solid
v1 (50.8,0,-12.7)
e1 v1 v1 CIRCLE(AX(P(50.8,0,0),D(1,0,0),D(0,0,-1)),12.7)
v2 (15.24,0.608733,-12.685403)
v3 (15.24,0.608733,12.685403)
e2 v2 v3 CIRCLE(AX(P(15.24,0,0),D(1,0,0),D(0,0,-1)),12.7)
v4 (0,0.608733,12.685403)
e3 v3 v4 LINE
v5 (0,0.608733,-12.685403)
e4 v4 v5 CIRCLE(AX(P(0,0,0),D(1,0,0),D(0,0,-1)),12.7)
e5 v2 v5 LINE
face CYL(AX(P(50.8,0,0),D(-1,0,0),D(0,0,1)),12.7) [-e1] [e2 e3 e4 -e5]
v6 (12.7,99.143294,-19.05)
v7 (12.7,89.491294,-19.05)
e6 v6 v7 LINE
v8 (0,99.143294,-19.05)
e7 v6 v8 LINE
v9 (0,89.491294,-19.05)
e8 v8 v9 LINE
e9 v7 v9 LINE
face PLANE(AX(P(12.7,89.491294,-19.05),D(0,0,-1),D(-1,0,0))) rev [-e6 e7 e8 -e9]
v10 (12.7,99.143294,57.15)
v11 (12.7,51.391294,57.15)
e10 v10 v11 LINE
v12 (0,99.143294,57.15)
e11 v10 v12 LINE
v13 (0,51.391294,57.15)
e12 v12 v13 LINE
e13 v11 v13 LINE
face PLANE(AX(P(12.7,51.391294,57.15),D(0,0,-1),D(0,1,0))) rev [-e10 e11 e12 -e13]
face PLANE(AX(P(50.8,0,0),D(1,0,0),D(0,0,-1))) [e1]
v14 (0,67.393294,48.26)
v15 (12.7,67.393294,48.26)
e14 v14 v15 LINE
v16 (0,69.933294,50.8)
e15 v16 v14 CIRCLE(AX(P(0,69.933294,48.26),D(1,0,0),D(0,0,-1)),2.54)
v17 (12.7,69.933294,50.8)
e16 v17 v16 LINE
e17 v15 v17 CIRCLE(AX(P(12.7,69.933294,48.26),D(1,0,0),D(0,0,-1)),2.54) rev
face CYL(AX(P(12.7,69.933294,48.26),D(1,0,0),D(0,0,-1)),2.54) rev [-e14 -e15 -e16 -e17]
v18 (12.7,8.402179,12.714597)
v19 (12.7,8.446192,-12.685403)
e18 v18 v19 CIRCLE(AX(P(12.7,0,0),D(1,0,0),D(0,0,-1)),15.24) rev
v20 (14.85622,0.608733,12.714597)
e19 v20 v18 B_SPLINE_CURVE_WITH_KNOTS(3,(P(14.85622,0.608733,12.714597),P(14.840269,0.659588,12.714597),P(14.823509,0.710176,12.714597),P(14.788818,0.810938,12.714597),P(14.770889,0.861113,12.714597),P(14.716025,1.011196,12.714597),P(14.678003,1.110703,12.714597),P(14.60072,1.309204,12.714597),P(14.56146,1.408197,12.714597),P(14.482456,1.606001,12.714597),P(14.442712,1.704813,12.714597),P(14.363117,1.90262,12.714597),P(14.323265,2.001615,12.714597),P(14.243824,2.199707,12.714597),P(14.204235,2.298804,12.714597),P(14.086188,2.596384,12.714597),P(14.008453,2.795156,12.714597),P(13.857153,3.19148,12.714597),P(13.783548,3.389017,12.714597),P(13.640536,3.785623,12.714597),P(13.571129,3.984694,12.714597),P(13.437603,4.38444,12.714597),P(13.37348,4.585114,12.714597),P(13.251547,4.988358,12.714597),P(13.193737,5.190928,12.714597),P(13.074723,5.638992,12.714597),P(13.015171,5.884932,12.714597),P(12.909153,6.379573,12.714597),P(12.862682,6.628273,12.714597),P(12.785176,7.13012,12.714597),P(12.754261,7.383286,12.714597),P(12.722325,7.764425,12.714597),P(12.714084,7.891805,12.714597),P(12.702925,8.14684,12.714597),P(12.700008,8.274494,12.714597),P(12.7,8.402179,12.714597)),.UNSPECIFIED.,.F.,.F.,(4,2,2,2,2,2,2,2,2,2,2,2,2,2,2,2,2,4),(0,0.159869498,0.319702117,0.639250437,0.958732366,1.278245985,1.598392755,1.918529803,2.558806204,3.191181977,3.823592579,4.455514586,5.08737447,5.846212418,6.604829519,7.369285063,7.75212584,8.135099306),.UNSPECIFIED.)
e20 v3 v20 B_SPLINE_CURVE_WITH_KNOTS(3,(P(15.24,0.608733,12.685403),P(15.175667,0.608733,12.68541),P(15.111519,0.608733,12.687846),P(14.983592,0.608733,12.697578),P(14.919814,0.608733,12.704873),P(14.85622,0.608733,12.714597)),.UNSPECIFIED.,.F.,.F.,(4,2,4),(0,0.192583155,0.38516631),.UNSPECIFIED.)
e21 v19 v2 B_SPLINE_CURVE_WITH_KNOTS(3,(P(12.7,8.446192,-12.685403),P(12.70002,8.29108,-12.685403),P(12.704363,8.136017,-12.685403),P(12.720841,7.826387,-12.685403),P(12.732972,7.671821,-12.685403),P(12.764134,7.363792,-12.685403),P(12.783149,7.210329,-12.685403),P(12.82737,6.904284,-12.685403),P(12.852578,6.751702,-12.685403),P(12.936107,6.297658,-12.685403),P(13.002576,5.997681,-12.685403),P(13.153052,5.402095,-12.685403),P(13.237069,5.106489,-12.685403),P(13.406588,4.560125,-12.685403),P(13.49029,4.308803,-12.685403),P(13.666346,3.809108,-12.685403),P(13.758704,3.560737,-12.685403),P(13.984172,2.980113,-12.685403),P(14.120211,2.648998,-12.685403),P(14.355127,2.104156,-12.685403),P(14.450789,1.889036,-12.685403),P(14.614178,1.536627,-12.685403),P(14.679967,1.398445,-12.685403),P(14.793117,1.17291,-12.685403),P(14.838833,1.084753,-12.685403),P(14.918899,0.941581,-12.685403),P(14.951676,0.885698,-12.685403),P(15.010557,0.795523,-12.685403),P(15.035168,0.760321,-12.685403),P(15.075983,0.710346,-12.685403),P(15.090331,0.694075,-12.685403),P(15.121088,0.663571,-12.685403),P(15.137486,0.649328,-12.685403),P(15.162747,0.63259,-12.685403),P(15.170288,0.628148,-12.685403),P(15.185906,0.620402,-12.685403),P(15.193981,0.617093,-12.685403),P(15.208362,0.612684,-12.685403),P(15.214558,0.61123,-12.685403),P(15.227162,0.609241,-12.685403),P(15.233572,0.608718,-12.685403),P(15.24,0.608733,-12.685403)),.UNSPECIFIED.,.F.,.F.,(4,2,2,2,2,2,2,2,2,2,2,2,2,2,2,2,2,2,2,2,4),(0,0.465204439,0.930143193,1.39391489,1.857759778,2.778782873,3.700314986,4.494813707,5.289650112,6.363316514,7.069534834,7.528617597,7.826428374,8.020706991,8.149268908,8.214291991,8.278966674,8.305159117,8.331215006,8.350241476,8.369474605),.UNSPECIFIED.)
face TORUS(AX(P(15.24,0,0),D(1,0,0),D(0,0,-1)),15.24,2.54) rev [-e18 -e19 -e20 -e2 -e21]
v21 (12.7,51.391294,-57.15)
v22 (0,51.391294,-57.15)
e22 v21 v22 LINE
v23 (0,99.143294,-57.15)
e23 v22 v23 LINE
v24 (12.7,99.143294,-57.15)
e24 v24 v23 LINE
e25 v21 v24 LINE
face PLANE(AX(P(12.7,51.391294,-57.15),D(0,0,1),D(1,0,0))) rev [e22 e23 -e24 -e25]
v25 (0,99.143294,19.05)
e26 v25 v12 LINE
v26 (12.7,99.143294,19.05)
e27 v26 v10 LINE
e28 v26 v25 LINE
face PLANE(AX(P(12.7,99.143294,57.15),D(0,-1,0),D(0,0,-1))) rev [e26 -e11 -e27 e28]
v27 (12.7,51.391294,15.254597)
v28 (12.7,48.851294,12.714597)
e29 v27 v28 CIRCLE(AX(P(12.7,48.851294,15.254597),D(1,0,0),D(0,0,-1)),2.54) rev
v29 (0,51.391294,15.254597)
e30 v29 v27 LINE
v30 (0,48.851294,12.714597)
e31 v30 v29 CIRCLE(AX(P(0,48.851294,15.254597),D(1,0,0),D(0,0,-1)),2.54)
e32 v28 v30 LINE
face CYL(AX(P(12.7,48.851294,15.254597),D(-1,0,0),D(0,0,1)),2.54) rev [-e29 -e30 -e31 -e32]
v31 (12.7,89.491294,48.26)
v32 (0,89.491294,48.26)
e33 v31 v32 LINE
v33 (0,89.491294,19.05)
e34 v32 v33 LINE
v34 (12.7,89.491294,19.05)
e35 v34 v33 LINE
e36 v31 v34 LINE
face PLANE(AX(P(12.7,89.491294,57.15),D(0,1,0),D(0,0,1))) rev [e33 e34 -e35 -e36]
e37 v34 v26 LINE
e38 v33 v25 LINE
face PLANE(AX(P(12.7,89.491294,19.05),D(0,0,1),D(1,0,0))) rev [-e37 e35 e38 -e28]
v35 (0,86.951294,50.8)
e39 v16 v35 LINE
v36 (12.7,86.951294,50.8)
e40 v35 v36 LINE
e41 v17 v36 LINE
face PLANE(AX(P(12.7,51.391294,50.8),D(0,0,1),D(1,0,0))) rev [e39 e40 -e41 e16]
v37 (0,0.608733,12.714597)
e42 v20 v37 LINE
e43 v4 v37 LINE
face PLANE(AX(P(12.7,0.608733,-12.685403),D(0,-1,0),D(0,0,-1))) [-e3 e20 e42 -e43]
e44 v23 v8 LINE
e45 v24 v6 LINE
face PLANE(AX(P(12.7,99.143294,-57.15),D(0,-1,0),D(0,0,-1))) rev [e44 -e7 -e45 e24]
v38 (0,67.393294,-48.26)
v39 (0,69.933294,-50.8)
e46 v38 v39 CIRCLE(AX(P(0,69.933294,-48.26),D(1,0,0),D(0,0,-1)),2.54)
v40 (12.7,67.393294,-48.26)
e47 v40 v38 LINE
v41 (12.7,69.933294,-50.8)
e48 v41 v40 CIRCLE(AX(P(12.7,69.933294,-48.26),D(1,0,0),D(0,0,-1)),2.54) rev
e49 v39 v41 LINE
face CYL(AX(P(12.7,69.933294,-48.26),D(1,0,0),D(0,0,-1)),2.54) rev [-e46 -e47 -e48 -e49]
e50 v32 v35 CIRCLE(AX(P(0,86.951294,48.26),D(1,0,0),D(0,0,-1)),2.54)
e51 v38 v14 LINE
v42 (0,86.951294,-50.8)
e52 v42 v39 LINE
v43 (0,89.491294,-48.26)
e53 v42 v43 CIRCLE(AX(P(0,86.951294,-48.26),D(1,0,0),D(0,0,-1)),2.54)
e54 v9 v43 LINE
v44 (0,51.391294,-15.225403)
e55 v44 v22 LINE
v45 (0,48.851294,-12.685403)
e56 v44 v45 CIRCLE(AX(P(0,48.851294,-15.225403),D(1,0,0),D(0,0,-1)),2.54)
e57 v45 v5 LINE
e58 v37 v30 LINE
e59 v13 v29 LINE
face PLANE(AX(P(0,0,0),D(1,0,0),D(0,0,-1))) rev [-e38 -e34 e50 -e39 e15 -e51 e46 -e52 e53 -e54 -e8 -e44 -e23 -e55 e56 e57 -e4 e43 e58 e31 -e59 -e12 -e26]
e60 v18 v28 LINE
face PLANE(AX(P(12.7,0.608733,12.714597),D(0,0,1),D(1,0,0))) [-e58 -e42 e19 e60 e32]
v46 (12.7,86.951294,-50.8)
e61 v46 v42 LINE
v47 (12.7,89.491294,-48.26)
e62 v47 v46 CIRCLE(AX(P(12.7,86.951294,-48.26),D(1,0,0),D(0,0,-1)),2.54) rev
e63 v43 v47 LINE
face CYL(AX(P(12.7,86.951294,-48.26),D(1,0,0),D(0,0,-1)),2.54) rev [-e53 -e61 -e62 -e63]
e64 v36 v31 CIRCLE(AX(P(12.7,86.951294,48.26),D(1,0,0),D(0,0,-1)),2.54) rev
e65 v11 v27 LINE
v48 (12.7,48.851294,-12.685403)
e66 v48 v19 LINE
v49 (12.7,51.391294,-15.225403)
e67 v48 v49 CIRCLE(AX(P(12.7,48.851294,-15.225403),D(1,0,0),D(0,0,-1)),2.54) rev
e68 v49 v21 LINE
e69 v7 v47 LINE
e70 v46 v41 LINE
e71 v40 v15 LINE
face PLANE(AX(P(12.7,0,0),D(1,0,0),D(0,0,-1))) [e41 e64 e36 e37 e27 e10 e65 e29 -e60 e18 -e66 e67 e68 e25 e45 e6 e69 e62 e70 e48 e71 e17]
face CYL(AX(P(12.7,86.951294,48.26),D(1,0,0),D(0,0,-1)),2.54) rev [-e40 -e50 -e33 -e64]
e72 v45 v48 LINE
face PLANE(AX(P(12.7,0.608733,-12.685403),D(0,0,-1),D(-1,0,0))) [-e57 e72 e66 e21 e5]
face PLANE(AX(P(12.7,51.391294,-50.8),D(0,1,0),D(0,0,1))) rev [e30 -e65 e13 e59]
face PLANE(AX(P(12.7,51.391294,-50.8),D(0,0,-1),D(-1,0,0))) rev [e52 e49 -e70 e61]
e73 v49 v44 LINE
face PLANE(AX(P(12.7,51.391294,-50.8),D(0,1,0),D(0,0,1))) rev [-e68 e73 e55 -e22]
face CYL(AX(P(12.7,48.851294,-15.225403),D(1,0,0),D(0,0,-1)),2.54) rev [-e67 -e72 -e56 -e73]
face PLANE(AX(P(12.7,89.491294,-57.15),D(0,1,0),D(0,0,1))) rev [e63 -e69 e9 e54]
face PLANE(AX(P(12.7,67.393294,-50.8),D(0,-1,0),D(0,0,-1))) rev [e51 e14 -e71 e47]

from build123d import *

# Parameters (mm, degrees)
SKETCH2_R           = 12.7
BOSS_EXTRUDE1_DEPTH = 50.8
SKETCH3_W           = 25.4
SKETCH3_H           = 50.8
BOSS_EXTRUDE2_DEPTH = 12.7
SKETCH5_W           = 101.6
SKETCH5_H           = 16.002
BOSS_EXTRUDE3_DEPTH = 12.7
SKETCH6_W           = 6.35
SKETCH6_H           = 38.1
BOSS_EXTRUDE4_DEPTH = 12.7
SKETCH7_W           = 38.1
SKETCH7_H           = 9.652
BOSS_EXTRUDE5_DEPTH = 12.7
FILLET1_R           = 2.54


with BuildPart() as part:
    # Sketch2 → Boss-Extrude1 (new body)
    with BuildSketch(Plane(origin=(0, 0, 0), x_dir=(0, 0, -1), z_dir=(1, 0, 0))):
        Circle(SKETCH2_R)
    extrude(amount=BOSS_EXTRUDE1_DEPTH)

    # Sketch3 → Boss-Extrude2 (add)
    with BuildSketch(Plane.ZY):
        with Locations((0.014597196, 26.008732875)):
            Rectangle(SKETCH3_W, SKETCH3_H)
    extrude(amount=-BOSS_EXTRUDE2_DEPTH)


with BuildPart() as body_2:
    # Sketch5 → Boss-Extrude3 (new body)
    with BuildSketch(Plane(origin=(0, 0, 0), x_dir=(0, 0, -1), z_dir=(1, 0, 0))):
        with Locations((0, 59.392294155)):
            Rectangle(SKETCH5_W, SKETCH5_H)
    extrude(amount=BOSS_EXTRUDE3_DEPTH)

    # Sketch6 → Boss-Extrude4 (add)
    with BuildSketch(Plane(origin=(0, 0, 0), x_dir=(0, 0, -1), z_dir=(1, 0, 0))):
        with Locations((-53.975, 70.441294155)):
            Rectangle(SKETCH6_W, SKETCH6_H)
        with Locations((53.975, 70.441294155)):
            Rectangle(SKETCH6_W, SKETCH6_H)
    extrude(amount=BOSS_EXTRUDE4_DEPTH)

    # Sketch7 → Boss-Extrude5 (add)
    with BuildSketch(Plane(origin=(0, 0, 0), x_dir=(0, 0, -1), z_dir=(1, 0, 0))):
        with Locations((-38.1, 94.317294155)):
            Rectangle(SKETCH7_W, SKETCH7_H)
        with Locations((38.1, 94.317294155)):
            Rectangle(SKETCH7_W, SKETCH7_H)
    extrude(amount=BOSS_EXTRUDE5_DEPTH)


with BuildPart() as part_1:
    add(part.part)

    # Combine1: union body 2
    add(body_2.part)

    # Fillet1
    # the kernel refuses this fillet: 2.54 mm, written as the material it adds along each edge
    with BuildSketch(Plane(origin=(12.7, 51.391294155, 12.714597196), x_dir=(0, -1, 0), z_dir=(-1, 0, 0)), Plane(origin=(0, 51.391294155, -12.685402804), x_dir=(0, -1, 0), z_dir=(1, 0, 0)), Plane(origin=(0, 67.393294155, -50.8), x_dir=(0, 1, 0), z_dir=(1, 0, 0))) as fillet1_piece_1:
        with BuildLine():
            CenterArc((FILLET1_R, FILLET1_R), FILLET1_R, 180, 90)
            Line((0, FILLET1_R), (0, 0))
            Line((0, 0), (FILLET1_R, 0))
        make_face()
    extrude(amount=12.7)
    with BuildSketch(Plane(origin=(12.7, 0, 0), x_dir=(0, -0.4374901189408423, 0.8992232180216032), z_dir=(0, -0.8992232180216032, -0.4374901189408423))) as fillet1_piece_2_section:
        with BuildLine():
            CenterArc((12.7 + FILLET1_R, -FILLET1_R), FILLET1_R, 90, 90)
            Line((12.7 + FILLET1_R, 0), (12.7, 0))
            Line((12.7, 0), (12.7, -FILLET1_R))
        make_face()
    fillet1_piece_2 = revolve(axis=Axis((12.7, 0, 0), (-1, 0, 0)), revolution_arc=231.887700359, mode=Mode.PRIVATE)
    fillet1_piece_2 = split(fillet1_piece_2, bisect_by=Plane(origin=(13.416714054, 13.416714034, -12.685402804), z_dir=(0, 0, 1)), keep=Keep.TOP, mode=Mode.PRIVATE)
    fillet1_piece_2 = split(fillet1_piece_2, bisect_by=Plane(origin=(13.416714054, 0.608732875, 0.00073746), z_dir=(0, 1, 0)), keep=Keep.TOP, mode=Mode.PRIVATE)
    fillet1_piece_2 = split(fillet1_piece_2, bisect_by=Plane(origin=(13.416714054, 13.416714034, 12.714597196), z_dir=(0, 0, -1)), keep=Keep.TOP, mode=Mode.PRIVATE)
    add(fillet1_piece_2)
    with BuildSketch(Plane(origin=(0, 89.491294155, -50.8), x_dir=(0, -1, 0), z_dir=(1, 0, 0)), Plane(origin=(0, 89.491294155, 50.8), x_dir=(0, 0, -1), z_dir=(1, 0, 0)), Plane(origin=(0, 67.393294155, 50.8), x_dir=(0, 1, 0), z_dir=(1, 0, 0))) as fillet1_piece_3:
        with BuildLine():
            CenterArc((FILLET1_R, -FILLET1_R), FILLET1_R, 90, 90)
            Line((0, -FILLET1_R), (0, 0))
            Line((0, 0), (FILLET1_R, 0))
        make_face()
    extrude(amount=12.7)


solid = part_1.part
